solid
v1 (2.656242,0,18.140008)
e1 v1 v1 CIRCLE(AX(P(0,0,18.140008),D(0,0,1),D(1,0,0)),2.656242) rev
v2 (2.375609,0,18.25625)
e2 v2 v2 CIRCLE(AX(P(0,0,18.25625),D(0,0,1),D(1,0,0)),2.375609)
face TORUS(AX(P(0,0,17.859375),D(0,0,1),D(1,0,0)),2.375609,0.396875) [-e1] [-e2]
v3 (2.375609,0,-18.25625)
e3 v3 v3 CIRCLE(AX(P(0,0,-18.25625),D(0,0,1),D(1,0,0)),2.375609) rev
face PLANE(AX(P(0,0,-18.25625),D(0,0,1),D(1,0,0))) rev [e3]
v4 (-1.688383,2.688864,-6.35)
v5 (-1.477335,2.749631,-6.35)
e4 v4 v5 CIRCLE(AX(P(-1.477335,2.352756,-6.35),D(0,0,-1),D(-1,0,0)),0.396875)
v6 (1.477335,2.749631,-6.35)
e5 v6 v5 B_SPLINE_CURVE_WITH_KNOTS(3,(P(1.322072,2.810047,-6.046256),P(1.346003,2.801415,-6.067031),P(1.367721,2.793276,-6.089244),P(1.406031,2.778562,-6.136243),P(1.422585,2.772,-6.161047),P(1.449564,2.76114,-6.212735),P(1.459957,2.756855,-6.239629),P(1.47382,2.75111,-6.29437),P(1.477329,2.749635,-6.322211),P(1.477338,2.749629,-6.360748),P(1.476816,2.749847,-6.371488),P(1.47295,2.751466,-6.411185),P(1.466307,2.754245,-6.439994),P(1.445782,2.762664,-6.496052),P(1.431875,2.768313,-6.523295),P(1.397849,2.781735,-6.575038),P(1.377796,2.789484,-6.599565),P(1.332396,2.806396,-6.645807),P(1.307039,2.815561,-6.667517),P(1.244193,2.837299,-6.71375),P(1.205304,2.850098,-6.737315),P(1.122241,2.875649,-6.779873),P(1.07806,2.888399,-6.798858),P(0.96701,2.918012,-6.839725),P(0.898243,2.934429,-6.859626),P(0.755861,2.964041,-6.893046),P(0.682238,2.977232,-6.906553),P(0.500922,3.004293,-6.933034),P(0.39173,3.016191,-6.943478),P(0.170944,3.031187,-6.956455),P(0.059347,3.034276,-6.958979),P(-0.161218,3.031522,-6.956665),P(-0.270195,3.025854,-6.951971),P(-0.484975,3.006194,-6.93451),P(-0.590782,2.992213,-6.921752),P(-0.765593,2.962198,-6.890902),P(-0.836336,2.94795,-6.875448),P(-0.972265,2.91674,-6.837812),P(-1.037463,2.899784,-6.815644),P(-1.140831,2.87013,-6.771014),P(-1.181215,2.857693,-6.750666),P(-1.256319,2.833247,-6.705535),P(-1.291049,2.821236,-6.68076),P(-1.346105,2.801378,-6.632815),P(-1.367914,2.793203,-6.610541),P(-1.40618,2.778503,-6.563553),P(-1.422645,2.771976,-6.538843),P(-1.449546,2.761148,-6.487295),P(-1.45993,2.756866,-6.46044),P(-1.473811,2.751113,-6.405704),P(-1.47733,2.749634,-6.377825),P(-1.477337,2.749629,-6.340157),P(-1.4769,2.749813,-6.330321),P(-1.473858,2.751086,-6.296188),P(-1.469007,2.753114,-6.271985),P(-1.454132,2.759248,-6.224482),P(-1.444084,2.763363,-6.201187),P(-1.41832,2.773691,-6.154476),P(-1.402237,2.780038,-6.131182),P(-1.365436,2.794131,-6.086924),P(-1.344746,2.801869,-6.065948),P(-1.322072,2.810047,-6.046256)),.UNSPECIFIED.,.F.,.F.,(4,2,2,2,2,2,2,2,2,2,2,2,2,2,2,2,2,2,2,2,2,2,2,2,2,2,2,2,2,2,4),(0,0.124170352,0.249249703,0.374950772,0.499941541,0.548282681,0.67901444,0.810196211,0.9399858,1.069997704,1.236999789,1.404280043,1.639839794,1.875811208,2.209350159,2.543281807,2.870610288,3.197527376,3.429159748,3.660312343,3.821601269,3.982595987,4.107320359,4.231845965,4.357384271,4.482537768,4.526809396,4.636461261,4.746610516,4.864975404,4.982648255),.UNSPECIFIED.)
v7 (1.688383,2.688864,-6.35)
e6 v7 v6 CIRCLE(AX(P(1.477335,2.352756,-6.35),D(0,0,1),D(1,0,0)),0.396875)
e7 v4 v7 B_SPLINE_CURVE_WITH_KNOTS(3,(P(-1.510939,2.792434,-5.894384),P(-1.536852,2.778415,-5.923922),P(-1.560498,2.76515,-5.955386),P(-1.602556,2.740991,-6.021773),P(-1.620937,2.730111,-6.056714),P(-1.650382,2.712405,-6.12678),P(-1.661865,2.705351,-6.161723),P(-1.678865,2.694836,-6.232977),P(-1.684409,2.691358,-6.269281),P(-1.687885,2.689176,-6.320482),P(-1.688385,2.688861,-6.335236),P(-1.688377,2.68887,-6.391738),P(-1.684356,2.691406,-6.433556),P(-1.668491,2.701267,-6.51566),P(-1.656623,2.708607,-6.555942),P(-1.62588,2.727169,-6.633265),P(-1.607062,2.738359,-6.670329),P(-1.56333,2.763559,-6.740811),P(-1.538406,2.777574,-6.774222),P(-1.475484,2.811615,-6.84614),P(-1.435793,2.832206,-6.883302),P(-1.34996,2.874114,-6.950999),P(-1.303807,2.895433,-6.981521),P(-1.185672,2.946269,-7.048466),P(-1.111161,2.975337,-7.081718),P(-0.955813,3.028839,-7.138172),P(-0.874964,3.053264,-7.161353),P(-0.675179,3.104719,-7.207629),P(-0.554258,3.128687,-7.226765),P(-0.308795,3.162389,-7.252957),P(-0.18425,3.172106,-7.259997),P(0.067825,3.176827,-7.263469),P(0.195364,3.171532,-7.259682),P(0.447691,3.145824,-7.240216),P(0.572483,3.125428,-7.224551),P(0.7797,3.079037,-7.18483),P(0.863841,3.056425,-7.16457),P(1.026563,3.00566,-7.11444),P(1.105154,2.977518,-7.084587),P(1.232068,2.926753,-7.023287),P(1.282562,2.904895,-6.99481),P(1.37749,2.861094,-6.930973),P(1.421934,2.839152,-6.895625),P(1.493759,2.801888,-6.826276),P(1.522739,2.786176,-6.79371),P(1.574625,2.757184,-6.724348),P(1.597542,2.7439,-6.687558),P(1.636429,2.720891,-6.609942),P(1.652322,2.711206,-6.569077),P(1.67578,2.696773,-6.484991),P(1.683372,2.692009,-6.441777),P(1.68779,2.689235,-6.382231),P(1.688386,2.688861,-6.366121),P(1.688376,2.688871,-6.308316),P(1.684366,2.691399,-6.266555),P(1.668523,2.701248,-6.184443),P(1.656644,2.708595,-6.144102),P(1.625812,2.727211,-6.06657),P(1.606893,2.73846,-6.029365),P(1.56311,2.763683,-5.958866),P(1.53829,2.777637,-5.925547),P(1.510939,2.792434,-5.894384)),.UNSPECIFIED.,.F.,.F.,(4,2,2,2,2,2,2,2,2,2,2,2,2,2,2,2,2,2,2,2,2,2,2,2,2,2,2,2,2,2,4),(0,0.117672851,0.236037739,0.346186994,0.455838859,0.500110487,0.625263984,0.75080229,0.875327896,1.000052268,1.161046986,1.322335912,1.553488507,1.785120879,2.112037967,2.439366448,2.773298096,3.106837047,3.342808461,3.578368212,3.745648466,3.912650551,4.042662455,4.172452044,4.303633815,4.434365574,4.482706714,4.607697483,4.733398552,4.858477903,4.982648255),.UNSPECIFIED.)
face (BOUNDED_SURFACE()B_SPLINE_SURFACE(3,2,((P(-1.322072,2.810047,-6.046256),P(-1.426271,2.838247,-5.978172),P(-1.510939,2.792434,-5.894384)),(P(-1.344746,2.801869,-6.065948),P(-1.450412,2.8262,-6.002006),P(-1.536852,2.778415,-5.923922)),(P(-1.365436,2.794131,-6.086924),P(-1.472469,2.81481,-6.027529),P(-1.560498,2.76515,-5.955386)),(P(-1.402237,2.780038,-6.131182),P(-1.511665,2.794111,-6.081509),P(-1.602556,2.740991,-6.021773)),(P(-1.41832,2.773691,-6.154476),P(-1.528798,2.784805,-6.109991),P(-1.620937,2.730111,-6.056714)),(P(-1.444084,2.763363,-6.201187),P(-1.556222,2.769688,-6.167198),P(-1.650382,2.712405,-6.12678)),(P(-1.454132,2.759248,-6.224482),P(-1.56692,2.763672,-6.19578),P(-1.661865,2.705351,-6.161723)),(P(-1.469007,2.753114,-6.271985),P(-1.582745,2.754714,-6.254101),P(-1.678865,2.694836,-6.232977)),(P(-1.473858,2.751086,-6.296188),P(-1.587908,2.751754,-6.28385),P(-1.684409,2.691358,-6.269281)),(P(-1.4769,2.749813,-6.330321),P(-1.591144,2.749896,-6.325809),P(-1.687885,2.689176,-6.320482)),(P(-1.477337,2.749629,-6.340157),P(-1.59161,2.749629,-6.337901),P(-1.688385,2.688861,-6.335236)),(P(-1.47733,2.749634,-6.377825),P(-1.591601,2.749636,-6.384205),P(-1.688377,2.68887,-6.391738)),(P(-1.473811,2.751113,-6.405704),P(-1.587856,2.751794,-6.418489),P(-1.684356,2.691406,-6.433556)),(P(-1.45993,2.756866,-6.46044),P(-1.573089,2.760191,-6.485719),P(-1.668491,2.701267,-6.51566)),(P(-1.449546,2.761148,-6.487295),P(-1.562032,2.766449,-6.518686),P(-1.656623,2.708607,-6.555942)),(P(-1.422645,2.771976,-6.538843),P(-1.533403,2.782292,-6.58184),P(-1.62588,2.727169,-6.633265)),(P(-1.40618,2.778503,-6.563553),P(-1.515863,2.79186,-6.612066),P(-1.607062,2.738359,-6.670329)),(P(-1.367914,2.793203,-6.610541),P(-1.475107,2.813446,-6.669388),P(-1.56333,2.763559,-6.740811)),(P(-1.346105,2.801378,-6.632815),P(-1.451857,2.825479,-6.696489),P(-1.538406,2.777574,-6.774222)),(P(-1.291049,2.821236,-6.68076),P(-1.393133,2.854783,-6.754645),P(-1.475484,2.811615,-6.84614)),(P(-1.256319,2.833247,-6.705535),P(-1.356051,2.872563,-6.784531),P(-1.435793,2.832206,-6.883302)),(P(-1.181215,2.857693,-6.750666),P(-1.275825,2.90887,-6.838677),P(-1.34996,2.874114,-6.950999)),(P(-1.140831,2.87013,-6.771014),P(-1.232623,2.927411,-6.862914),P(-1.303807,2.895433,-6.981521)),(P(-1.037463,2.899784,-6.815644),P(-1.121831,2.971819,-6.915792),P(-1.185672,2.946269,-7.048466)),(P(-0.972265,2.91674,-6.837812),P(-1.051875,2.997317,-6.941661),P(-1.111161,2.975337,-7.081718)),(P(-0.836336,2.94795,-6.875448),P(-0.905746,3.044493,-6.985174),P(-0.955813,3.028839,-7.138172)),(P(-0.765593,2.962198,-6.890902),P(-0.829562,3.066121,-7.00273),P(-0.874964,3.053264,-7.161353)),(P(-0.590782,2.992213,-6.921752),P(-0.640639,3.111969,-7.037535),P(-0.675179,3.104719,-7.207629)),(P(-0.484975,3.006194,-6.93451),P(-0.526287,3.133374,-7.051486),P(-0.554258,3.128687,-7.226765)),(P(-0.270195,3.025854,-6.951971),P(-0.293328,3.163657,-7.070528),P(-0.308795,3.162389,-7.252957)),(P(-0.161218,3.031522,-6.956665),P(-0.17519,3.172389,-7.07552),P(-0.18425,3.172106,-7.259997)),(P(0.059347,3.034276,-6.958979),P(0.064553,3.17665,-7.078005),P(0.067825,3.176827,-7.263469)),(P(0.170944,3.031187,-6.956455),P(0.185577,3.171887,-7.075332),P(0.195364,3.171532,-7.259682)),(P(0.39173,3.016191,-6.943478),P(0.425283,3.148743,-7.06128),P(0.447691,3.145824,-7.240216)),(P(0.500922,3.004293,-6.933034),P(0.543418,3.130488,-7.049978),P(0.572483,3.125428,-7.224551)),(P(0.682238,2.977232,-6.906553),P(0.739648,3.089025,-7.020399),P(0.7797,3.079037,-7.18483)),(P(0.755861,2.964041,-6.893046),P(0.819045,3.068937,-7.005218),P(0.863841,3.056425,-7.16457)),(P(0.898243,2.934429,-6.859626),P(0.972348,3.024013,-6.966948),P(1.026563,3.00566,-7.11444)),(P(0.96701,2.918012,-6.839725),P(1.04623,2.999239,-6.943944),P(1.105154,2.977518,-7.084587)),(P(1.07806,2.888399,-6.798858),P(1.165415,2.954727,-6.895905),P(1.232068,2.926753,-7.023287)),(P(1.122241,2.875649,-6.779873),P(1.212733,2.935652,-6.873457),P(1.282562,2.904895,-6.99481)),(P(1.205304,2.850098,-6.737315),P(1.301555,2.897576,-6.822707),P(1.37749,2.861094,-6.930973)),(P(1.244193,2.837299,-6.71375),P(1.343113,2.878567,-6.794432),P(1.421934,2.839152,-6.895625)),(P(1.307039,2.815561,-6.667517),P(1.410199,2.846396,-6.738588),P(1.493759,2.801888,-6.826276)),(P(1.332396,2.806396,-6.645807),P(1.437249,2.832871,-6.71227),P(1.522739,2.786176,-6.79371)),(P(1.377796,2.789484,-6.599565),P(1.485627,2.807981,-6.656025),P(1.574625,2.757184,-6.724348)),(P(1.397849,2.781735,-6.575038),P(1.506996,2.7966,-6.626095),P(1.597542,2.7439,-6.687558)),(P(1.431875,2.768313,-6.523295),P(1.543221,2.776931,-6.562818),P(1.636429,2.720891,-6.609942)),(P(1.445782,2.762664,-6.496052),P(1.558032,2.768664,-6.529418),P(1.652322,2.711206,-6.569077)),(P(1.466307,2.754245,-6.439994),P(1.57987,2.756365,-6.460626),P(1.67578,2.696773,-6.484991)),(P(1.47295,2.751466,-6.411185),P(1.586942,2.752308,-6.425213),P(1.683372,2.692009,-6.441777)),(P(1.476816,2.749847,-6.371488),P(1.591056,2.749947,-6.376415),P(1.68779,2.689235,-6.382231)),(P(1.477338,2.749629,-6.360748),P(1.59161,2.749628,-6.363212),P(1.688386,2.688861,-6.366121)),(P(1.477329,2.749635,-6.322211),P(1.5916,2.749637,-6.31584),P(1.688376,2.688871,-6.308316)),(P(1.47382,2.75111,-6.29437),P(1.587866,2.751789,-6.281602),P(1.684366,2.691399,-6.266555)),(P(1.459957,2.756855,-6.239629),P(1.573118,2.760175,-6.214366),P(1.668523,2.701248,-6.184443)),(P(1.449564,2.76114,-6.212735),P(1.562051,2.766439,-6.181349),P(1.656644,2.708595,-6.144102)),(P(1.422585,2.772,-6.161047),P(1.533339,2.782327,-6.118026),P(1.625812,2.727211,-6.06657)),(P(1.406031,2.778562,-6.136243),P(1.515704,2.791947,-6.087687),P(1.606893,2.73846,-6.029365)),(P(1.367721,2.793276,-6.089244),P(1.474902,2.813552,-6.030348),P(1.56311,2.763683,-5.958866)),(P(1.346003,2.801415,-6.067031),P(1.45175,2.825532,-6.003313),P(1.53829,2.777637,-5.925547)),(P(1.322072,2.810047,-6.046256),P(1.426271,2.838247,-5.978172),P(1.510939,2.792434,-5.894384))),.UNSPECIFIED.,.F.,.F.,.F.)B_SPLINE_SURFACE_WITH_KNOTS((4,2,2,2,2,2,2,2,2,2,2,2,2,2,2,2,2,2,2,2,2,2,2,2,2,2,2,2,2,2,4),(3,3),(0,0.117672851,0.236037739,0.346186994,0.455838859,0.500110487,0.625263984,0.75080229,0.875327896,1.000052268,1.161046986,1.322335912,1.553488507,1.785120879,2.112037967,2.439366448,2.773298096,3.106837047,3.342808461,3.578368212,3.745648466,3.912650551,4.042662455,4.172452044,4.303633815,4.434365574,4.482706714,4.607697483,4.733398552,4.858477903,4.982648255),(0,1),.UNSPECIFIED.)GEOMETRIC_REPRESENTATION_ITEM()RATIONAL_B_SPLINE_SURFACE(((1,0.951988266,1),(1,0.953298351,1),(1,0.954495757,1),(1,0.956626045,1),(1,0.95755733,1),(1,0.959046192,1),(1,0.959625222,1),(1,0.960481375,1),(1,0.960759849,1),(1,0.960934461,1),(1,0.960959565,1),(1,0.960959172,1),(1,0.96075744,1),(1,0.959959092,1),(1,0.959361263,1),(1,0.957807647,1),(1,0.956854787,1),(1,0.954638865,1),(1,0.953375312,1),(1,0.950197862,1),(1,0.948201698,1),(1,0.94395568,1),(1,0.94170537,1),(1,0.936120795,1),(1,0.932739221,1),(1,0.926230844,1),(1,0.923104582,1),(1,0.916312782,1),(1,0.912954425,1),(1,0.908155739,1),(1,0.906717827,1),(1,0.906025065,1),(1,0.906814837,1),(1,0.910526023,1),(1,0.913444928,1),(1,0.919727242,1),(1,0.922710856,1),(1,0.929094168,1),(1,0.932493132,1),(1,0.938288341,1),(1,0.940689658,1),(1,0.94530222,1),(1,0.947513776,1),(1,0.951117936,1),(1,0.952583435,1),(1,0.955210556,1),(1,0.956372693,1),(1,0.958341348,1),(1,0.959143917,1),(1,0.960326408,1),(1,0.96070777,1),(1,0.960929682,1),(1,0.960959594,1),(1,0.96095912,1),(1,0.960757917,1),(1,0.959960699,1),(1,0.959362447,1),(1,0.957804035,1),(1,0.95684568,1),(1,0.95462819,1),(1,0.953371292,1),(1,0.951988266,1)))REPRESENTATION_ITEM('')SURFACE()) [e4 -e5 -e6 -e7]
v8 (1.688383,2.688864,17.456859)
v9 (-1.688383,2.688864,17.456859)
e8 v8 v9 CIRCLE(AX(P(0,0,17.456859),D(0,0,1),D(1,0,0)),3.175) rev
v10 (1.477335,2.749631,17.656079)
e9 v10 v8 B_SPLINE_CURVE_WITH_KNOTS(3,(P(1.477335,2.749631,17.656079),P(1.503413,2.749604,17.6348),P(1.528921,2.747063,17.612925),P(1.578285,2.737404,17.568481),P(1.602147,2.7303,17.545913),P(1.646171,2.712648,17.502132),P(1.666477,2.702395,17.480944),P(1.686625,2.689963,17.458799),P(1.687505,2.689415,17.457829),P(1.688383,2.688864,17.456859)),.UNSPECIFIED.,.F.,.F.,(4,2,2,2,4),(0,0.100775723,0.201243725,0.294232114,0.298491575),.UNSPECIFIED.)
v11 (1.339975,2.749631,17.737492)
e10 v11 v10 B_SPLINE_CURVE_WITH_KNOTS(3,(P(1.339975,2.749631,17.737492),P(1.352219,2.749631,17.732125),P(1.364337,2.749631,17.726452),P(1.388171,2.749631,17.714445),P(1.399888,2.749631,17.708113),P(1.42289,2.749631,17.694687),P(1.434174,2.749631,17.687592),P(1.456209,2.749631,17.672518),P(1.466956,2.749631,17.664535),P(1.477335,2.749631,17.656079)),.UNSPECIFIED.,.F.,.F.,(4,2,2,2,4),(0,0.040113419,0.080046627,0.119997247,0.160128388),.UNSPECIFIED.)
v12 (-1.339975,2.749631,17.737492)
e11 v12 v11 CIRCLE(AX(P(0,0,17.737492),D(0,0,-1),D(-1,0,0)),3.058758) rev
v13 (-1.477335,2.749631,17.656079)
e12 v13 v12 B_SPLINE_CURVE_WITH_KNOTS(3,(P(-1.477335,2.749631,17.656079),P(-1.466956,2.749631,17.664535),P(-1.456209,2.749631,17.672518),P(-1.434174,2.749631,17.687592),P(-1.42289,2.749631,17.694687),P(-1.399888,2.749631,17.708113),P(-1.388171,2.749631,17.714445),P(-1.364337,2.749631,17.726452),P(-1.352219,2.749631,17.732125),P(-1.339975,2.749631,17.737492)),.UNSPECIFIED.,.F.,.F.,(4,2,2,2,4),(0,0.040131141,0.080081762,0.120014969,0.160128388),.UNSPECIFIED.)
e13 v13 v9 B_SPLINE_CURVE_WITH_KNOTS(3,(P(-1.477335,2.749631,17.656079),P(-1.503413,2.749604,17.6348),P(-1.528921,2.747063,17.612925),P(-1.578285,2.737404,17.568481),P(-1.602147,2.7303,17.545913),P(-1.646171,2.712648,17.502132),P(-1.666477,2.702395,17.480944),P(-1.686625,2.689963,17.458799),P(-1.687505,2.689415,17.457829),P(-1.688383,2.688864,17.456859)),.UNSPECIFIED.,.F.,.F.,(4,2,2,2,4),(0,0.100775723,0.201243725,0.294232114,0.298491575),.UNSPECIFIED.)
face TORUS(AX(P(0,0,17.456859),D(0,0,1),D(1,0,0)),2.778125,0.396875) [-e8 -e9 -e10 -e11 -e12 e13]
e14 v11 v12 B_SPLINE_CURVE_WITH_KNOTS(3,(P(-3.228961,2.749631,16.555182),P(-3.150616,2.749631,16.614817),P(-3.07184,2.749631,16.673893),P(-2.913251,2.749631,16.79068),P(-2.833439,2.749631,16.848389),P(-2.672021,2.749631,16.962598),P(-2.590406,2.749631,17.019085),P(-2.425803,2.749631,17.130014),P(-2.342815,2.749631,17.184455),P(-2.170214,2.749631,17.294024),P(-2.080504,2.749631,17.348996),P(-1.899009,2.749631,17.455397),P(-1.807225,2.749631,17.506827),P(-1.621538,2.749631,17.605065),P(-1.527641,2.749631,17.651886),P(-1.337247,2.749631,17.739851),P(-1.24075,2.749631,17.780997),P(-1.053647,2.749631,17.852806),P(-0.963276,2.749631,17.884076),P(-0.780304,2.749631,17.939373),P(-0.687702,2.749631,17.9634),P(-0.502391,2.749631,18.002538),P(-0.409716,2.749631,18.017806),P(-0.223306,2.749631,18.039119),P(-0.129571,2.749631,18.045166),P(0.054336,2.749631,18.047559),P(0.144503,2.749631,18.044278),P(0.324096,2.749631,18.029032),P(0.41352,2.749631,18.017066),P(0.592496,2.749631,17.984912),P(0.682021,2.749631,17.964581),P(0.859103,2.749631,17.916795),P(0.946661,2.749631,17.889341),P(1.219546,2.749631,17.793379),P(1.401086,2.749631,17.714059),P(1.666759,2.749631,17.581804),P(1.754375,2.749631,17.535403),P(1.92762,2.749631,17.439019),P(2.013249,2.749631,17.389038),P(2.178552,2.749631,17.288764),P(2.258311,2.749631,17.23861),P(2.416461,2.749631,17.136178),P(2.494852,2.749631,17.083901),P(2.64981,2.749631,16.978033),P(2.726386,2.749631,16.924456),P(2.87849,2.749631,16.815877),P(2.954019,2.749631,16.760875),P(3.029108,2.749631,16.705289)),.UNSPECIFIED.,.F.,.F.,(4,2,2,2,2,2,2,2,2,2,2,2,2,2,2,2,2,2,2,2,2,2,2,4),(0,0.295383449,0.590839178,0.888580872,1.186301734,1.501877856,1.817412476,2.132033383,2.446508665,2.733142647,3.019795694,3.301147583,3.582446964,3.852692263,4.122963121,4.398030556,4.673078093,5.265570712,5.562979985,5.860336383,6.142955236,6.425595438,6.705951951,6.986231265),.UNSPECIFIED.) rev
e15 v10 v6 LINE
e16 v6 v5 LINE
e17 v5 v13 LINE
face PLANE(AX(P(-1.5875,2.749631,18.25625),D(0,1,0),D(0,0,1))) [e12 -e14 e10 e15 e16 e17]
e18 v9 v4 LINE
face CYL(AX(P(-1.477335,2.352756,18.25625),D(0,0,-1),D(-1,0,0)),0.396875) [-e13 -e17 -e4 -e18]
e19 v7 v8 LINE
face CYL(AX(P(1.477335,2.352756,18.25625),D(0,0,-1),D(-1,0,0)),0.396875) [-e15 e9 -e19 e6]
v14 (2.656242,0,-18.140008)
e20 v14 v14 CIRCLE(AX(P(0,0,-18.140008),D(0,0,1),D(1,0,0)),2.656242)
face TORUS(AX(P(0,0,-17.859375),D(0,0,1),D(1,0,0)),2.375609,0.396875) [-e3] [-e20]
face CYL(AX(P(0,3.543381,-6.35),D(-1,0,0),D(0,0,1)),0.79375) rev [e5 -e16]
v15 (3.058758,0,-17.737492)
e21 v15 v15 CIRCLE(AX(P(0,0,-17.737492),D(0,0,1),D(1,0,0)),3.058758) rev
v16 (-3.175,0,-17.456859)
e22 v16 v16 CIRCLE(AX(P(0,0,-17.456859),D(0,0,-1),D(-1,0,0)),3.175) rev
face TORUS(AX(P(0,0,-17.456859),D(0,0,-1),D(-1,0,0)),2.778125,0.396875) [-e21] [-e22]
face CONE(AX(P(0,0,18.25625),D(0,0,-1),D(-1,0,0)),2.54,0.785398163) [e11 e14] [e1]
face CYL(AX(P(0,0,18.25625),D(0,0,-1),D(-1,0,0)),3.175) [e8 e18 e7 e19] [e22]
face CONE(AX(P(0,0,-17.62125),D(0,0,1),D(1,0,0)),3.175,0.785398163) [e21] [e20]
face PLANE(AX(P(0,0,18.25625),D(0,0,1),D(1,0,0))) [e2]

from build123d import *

# Parameters (mm, degrees)
SKETCH1_R      = 3.175
EXTRUDE1_DEPTH = 18.25625
CHAMFER1_SIZE  = 0.635
EXTRUDE7_DEPTH = 26.793821935
FILLET1_R      = 0.79375
FILLET3_R      = 0.396875


with BuildPart() as part:
    # Sketch1 → Extrude1 (new, symmetric)
    with BuildSketch(Plane.XY):
        Circle(SKETCH1_R)
    extrude(amount=EXTRUDE1_DEPTH, both=True)

    # Chamfer1
    chamfer1_edges = [part.edges().sort_by_distance(p)[0] for p in [
        (-3.175, 0, -18.25625),
        (-3.175, 0, 18.25625),
    ]]
    chamfer(chamfer1_edges, length=CHAMFER1_SIZE)

    # Sketch13 → Extrude7 (cut, through all)
    with BuildSketch(Plane.XY.offset(-7.14375)):
        with BuildLine():
            Line((-1.5875, 2.749630657), (1.5875, 2.749630657))
            ThreePointArc((1.5875, 2.749630657), (0, 3.175), (-1.5875, 2.749630657))
        make_face()
    extrude(amount=EXTRUDE7_DEPTH, mode=Mode.SUBTRACT)

    # Fillet1
    # the kernel refuses this fillet: 0.79375 mm, written as the material it adds along each edge
    with BuildSketch(Plane(origin=(-3.571875, 2.749630657, -7.14375), x_dir=(0, 0, 1), z_dir=(1, 0, 0))) as fillet1_piece_1_section:
        with BuildLine():
            CenterArc((FILLET1_R, -FILLET1_R), FILLET1_R, 90, 90)
            Line((0, -FILLET1_R), (0, 0))
            Line((0, 0), (FILLET1_R, 0))
        make_face()
    fillet1_piece_1 = extrude(amount=7.14375, mode=Mode.PRIVATE)
    fillet1_piece_1 = fillet1_piece_1 & Plane(origin=(0, 0, -6.922980594), x_dir=(1, 0, 0), z_dir=(0, 0, 1)) * Cylinder(3.175, 18, mode=Mode.PRIVATE)
    add(fillet1_piece_1)

    # Fillet3
    fillet3_edges = [part.edges().sort_by_distance(p)[0] for p in [
        (1.5875, 2.749630657, 5.635625),
        (-1.5875, 2.749630657, 5.635625),
        (0, 3.175, -7.053089435),
        (-2.54, 0, -18.25625),
        (-3.175, 0, -17.62125),
        (-2.54, 0, 18.25625),
        (-1.5875, -2.749630657, 17.62125),
    ]]
    fillet(fillet3_edges, radius=FILLET3_R)


solid = part.part
